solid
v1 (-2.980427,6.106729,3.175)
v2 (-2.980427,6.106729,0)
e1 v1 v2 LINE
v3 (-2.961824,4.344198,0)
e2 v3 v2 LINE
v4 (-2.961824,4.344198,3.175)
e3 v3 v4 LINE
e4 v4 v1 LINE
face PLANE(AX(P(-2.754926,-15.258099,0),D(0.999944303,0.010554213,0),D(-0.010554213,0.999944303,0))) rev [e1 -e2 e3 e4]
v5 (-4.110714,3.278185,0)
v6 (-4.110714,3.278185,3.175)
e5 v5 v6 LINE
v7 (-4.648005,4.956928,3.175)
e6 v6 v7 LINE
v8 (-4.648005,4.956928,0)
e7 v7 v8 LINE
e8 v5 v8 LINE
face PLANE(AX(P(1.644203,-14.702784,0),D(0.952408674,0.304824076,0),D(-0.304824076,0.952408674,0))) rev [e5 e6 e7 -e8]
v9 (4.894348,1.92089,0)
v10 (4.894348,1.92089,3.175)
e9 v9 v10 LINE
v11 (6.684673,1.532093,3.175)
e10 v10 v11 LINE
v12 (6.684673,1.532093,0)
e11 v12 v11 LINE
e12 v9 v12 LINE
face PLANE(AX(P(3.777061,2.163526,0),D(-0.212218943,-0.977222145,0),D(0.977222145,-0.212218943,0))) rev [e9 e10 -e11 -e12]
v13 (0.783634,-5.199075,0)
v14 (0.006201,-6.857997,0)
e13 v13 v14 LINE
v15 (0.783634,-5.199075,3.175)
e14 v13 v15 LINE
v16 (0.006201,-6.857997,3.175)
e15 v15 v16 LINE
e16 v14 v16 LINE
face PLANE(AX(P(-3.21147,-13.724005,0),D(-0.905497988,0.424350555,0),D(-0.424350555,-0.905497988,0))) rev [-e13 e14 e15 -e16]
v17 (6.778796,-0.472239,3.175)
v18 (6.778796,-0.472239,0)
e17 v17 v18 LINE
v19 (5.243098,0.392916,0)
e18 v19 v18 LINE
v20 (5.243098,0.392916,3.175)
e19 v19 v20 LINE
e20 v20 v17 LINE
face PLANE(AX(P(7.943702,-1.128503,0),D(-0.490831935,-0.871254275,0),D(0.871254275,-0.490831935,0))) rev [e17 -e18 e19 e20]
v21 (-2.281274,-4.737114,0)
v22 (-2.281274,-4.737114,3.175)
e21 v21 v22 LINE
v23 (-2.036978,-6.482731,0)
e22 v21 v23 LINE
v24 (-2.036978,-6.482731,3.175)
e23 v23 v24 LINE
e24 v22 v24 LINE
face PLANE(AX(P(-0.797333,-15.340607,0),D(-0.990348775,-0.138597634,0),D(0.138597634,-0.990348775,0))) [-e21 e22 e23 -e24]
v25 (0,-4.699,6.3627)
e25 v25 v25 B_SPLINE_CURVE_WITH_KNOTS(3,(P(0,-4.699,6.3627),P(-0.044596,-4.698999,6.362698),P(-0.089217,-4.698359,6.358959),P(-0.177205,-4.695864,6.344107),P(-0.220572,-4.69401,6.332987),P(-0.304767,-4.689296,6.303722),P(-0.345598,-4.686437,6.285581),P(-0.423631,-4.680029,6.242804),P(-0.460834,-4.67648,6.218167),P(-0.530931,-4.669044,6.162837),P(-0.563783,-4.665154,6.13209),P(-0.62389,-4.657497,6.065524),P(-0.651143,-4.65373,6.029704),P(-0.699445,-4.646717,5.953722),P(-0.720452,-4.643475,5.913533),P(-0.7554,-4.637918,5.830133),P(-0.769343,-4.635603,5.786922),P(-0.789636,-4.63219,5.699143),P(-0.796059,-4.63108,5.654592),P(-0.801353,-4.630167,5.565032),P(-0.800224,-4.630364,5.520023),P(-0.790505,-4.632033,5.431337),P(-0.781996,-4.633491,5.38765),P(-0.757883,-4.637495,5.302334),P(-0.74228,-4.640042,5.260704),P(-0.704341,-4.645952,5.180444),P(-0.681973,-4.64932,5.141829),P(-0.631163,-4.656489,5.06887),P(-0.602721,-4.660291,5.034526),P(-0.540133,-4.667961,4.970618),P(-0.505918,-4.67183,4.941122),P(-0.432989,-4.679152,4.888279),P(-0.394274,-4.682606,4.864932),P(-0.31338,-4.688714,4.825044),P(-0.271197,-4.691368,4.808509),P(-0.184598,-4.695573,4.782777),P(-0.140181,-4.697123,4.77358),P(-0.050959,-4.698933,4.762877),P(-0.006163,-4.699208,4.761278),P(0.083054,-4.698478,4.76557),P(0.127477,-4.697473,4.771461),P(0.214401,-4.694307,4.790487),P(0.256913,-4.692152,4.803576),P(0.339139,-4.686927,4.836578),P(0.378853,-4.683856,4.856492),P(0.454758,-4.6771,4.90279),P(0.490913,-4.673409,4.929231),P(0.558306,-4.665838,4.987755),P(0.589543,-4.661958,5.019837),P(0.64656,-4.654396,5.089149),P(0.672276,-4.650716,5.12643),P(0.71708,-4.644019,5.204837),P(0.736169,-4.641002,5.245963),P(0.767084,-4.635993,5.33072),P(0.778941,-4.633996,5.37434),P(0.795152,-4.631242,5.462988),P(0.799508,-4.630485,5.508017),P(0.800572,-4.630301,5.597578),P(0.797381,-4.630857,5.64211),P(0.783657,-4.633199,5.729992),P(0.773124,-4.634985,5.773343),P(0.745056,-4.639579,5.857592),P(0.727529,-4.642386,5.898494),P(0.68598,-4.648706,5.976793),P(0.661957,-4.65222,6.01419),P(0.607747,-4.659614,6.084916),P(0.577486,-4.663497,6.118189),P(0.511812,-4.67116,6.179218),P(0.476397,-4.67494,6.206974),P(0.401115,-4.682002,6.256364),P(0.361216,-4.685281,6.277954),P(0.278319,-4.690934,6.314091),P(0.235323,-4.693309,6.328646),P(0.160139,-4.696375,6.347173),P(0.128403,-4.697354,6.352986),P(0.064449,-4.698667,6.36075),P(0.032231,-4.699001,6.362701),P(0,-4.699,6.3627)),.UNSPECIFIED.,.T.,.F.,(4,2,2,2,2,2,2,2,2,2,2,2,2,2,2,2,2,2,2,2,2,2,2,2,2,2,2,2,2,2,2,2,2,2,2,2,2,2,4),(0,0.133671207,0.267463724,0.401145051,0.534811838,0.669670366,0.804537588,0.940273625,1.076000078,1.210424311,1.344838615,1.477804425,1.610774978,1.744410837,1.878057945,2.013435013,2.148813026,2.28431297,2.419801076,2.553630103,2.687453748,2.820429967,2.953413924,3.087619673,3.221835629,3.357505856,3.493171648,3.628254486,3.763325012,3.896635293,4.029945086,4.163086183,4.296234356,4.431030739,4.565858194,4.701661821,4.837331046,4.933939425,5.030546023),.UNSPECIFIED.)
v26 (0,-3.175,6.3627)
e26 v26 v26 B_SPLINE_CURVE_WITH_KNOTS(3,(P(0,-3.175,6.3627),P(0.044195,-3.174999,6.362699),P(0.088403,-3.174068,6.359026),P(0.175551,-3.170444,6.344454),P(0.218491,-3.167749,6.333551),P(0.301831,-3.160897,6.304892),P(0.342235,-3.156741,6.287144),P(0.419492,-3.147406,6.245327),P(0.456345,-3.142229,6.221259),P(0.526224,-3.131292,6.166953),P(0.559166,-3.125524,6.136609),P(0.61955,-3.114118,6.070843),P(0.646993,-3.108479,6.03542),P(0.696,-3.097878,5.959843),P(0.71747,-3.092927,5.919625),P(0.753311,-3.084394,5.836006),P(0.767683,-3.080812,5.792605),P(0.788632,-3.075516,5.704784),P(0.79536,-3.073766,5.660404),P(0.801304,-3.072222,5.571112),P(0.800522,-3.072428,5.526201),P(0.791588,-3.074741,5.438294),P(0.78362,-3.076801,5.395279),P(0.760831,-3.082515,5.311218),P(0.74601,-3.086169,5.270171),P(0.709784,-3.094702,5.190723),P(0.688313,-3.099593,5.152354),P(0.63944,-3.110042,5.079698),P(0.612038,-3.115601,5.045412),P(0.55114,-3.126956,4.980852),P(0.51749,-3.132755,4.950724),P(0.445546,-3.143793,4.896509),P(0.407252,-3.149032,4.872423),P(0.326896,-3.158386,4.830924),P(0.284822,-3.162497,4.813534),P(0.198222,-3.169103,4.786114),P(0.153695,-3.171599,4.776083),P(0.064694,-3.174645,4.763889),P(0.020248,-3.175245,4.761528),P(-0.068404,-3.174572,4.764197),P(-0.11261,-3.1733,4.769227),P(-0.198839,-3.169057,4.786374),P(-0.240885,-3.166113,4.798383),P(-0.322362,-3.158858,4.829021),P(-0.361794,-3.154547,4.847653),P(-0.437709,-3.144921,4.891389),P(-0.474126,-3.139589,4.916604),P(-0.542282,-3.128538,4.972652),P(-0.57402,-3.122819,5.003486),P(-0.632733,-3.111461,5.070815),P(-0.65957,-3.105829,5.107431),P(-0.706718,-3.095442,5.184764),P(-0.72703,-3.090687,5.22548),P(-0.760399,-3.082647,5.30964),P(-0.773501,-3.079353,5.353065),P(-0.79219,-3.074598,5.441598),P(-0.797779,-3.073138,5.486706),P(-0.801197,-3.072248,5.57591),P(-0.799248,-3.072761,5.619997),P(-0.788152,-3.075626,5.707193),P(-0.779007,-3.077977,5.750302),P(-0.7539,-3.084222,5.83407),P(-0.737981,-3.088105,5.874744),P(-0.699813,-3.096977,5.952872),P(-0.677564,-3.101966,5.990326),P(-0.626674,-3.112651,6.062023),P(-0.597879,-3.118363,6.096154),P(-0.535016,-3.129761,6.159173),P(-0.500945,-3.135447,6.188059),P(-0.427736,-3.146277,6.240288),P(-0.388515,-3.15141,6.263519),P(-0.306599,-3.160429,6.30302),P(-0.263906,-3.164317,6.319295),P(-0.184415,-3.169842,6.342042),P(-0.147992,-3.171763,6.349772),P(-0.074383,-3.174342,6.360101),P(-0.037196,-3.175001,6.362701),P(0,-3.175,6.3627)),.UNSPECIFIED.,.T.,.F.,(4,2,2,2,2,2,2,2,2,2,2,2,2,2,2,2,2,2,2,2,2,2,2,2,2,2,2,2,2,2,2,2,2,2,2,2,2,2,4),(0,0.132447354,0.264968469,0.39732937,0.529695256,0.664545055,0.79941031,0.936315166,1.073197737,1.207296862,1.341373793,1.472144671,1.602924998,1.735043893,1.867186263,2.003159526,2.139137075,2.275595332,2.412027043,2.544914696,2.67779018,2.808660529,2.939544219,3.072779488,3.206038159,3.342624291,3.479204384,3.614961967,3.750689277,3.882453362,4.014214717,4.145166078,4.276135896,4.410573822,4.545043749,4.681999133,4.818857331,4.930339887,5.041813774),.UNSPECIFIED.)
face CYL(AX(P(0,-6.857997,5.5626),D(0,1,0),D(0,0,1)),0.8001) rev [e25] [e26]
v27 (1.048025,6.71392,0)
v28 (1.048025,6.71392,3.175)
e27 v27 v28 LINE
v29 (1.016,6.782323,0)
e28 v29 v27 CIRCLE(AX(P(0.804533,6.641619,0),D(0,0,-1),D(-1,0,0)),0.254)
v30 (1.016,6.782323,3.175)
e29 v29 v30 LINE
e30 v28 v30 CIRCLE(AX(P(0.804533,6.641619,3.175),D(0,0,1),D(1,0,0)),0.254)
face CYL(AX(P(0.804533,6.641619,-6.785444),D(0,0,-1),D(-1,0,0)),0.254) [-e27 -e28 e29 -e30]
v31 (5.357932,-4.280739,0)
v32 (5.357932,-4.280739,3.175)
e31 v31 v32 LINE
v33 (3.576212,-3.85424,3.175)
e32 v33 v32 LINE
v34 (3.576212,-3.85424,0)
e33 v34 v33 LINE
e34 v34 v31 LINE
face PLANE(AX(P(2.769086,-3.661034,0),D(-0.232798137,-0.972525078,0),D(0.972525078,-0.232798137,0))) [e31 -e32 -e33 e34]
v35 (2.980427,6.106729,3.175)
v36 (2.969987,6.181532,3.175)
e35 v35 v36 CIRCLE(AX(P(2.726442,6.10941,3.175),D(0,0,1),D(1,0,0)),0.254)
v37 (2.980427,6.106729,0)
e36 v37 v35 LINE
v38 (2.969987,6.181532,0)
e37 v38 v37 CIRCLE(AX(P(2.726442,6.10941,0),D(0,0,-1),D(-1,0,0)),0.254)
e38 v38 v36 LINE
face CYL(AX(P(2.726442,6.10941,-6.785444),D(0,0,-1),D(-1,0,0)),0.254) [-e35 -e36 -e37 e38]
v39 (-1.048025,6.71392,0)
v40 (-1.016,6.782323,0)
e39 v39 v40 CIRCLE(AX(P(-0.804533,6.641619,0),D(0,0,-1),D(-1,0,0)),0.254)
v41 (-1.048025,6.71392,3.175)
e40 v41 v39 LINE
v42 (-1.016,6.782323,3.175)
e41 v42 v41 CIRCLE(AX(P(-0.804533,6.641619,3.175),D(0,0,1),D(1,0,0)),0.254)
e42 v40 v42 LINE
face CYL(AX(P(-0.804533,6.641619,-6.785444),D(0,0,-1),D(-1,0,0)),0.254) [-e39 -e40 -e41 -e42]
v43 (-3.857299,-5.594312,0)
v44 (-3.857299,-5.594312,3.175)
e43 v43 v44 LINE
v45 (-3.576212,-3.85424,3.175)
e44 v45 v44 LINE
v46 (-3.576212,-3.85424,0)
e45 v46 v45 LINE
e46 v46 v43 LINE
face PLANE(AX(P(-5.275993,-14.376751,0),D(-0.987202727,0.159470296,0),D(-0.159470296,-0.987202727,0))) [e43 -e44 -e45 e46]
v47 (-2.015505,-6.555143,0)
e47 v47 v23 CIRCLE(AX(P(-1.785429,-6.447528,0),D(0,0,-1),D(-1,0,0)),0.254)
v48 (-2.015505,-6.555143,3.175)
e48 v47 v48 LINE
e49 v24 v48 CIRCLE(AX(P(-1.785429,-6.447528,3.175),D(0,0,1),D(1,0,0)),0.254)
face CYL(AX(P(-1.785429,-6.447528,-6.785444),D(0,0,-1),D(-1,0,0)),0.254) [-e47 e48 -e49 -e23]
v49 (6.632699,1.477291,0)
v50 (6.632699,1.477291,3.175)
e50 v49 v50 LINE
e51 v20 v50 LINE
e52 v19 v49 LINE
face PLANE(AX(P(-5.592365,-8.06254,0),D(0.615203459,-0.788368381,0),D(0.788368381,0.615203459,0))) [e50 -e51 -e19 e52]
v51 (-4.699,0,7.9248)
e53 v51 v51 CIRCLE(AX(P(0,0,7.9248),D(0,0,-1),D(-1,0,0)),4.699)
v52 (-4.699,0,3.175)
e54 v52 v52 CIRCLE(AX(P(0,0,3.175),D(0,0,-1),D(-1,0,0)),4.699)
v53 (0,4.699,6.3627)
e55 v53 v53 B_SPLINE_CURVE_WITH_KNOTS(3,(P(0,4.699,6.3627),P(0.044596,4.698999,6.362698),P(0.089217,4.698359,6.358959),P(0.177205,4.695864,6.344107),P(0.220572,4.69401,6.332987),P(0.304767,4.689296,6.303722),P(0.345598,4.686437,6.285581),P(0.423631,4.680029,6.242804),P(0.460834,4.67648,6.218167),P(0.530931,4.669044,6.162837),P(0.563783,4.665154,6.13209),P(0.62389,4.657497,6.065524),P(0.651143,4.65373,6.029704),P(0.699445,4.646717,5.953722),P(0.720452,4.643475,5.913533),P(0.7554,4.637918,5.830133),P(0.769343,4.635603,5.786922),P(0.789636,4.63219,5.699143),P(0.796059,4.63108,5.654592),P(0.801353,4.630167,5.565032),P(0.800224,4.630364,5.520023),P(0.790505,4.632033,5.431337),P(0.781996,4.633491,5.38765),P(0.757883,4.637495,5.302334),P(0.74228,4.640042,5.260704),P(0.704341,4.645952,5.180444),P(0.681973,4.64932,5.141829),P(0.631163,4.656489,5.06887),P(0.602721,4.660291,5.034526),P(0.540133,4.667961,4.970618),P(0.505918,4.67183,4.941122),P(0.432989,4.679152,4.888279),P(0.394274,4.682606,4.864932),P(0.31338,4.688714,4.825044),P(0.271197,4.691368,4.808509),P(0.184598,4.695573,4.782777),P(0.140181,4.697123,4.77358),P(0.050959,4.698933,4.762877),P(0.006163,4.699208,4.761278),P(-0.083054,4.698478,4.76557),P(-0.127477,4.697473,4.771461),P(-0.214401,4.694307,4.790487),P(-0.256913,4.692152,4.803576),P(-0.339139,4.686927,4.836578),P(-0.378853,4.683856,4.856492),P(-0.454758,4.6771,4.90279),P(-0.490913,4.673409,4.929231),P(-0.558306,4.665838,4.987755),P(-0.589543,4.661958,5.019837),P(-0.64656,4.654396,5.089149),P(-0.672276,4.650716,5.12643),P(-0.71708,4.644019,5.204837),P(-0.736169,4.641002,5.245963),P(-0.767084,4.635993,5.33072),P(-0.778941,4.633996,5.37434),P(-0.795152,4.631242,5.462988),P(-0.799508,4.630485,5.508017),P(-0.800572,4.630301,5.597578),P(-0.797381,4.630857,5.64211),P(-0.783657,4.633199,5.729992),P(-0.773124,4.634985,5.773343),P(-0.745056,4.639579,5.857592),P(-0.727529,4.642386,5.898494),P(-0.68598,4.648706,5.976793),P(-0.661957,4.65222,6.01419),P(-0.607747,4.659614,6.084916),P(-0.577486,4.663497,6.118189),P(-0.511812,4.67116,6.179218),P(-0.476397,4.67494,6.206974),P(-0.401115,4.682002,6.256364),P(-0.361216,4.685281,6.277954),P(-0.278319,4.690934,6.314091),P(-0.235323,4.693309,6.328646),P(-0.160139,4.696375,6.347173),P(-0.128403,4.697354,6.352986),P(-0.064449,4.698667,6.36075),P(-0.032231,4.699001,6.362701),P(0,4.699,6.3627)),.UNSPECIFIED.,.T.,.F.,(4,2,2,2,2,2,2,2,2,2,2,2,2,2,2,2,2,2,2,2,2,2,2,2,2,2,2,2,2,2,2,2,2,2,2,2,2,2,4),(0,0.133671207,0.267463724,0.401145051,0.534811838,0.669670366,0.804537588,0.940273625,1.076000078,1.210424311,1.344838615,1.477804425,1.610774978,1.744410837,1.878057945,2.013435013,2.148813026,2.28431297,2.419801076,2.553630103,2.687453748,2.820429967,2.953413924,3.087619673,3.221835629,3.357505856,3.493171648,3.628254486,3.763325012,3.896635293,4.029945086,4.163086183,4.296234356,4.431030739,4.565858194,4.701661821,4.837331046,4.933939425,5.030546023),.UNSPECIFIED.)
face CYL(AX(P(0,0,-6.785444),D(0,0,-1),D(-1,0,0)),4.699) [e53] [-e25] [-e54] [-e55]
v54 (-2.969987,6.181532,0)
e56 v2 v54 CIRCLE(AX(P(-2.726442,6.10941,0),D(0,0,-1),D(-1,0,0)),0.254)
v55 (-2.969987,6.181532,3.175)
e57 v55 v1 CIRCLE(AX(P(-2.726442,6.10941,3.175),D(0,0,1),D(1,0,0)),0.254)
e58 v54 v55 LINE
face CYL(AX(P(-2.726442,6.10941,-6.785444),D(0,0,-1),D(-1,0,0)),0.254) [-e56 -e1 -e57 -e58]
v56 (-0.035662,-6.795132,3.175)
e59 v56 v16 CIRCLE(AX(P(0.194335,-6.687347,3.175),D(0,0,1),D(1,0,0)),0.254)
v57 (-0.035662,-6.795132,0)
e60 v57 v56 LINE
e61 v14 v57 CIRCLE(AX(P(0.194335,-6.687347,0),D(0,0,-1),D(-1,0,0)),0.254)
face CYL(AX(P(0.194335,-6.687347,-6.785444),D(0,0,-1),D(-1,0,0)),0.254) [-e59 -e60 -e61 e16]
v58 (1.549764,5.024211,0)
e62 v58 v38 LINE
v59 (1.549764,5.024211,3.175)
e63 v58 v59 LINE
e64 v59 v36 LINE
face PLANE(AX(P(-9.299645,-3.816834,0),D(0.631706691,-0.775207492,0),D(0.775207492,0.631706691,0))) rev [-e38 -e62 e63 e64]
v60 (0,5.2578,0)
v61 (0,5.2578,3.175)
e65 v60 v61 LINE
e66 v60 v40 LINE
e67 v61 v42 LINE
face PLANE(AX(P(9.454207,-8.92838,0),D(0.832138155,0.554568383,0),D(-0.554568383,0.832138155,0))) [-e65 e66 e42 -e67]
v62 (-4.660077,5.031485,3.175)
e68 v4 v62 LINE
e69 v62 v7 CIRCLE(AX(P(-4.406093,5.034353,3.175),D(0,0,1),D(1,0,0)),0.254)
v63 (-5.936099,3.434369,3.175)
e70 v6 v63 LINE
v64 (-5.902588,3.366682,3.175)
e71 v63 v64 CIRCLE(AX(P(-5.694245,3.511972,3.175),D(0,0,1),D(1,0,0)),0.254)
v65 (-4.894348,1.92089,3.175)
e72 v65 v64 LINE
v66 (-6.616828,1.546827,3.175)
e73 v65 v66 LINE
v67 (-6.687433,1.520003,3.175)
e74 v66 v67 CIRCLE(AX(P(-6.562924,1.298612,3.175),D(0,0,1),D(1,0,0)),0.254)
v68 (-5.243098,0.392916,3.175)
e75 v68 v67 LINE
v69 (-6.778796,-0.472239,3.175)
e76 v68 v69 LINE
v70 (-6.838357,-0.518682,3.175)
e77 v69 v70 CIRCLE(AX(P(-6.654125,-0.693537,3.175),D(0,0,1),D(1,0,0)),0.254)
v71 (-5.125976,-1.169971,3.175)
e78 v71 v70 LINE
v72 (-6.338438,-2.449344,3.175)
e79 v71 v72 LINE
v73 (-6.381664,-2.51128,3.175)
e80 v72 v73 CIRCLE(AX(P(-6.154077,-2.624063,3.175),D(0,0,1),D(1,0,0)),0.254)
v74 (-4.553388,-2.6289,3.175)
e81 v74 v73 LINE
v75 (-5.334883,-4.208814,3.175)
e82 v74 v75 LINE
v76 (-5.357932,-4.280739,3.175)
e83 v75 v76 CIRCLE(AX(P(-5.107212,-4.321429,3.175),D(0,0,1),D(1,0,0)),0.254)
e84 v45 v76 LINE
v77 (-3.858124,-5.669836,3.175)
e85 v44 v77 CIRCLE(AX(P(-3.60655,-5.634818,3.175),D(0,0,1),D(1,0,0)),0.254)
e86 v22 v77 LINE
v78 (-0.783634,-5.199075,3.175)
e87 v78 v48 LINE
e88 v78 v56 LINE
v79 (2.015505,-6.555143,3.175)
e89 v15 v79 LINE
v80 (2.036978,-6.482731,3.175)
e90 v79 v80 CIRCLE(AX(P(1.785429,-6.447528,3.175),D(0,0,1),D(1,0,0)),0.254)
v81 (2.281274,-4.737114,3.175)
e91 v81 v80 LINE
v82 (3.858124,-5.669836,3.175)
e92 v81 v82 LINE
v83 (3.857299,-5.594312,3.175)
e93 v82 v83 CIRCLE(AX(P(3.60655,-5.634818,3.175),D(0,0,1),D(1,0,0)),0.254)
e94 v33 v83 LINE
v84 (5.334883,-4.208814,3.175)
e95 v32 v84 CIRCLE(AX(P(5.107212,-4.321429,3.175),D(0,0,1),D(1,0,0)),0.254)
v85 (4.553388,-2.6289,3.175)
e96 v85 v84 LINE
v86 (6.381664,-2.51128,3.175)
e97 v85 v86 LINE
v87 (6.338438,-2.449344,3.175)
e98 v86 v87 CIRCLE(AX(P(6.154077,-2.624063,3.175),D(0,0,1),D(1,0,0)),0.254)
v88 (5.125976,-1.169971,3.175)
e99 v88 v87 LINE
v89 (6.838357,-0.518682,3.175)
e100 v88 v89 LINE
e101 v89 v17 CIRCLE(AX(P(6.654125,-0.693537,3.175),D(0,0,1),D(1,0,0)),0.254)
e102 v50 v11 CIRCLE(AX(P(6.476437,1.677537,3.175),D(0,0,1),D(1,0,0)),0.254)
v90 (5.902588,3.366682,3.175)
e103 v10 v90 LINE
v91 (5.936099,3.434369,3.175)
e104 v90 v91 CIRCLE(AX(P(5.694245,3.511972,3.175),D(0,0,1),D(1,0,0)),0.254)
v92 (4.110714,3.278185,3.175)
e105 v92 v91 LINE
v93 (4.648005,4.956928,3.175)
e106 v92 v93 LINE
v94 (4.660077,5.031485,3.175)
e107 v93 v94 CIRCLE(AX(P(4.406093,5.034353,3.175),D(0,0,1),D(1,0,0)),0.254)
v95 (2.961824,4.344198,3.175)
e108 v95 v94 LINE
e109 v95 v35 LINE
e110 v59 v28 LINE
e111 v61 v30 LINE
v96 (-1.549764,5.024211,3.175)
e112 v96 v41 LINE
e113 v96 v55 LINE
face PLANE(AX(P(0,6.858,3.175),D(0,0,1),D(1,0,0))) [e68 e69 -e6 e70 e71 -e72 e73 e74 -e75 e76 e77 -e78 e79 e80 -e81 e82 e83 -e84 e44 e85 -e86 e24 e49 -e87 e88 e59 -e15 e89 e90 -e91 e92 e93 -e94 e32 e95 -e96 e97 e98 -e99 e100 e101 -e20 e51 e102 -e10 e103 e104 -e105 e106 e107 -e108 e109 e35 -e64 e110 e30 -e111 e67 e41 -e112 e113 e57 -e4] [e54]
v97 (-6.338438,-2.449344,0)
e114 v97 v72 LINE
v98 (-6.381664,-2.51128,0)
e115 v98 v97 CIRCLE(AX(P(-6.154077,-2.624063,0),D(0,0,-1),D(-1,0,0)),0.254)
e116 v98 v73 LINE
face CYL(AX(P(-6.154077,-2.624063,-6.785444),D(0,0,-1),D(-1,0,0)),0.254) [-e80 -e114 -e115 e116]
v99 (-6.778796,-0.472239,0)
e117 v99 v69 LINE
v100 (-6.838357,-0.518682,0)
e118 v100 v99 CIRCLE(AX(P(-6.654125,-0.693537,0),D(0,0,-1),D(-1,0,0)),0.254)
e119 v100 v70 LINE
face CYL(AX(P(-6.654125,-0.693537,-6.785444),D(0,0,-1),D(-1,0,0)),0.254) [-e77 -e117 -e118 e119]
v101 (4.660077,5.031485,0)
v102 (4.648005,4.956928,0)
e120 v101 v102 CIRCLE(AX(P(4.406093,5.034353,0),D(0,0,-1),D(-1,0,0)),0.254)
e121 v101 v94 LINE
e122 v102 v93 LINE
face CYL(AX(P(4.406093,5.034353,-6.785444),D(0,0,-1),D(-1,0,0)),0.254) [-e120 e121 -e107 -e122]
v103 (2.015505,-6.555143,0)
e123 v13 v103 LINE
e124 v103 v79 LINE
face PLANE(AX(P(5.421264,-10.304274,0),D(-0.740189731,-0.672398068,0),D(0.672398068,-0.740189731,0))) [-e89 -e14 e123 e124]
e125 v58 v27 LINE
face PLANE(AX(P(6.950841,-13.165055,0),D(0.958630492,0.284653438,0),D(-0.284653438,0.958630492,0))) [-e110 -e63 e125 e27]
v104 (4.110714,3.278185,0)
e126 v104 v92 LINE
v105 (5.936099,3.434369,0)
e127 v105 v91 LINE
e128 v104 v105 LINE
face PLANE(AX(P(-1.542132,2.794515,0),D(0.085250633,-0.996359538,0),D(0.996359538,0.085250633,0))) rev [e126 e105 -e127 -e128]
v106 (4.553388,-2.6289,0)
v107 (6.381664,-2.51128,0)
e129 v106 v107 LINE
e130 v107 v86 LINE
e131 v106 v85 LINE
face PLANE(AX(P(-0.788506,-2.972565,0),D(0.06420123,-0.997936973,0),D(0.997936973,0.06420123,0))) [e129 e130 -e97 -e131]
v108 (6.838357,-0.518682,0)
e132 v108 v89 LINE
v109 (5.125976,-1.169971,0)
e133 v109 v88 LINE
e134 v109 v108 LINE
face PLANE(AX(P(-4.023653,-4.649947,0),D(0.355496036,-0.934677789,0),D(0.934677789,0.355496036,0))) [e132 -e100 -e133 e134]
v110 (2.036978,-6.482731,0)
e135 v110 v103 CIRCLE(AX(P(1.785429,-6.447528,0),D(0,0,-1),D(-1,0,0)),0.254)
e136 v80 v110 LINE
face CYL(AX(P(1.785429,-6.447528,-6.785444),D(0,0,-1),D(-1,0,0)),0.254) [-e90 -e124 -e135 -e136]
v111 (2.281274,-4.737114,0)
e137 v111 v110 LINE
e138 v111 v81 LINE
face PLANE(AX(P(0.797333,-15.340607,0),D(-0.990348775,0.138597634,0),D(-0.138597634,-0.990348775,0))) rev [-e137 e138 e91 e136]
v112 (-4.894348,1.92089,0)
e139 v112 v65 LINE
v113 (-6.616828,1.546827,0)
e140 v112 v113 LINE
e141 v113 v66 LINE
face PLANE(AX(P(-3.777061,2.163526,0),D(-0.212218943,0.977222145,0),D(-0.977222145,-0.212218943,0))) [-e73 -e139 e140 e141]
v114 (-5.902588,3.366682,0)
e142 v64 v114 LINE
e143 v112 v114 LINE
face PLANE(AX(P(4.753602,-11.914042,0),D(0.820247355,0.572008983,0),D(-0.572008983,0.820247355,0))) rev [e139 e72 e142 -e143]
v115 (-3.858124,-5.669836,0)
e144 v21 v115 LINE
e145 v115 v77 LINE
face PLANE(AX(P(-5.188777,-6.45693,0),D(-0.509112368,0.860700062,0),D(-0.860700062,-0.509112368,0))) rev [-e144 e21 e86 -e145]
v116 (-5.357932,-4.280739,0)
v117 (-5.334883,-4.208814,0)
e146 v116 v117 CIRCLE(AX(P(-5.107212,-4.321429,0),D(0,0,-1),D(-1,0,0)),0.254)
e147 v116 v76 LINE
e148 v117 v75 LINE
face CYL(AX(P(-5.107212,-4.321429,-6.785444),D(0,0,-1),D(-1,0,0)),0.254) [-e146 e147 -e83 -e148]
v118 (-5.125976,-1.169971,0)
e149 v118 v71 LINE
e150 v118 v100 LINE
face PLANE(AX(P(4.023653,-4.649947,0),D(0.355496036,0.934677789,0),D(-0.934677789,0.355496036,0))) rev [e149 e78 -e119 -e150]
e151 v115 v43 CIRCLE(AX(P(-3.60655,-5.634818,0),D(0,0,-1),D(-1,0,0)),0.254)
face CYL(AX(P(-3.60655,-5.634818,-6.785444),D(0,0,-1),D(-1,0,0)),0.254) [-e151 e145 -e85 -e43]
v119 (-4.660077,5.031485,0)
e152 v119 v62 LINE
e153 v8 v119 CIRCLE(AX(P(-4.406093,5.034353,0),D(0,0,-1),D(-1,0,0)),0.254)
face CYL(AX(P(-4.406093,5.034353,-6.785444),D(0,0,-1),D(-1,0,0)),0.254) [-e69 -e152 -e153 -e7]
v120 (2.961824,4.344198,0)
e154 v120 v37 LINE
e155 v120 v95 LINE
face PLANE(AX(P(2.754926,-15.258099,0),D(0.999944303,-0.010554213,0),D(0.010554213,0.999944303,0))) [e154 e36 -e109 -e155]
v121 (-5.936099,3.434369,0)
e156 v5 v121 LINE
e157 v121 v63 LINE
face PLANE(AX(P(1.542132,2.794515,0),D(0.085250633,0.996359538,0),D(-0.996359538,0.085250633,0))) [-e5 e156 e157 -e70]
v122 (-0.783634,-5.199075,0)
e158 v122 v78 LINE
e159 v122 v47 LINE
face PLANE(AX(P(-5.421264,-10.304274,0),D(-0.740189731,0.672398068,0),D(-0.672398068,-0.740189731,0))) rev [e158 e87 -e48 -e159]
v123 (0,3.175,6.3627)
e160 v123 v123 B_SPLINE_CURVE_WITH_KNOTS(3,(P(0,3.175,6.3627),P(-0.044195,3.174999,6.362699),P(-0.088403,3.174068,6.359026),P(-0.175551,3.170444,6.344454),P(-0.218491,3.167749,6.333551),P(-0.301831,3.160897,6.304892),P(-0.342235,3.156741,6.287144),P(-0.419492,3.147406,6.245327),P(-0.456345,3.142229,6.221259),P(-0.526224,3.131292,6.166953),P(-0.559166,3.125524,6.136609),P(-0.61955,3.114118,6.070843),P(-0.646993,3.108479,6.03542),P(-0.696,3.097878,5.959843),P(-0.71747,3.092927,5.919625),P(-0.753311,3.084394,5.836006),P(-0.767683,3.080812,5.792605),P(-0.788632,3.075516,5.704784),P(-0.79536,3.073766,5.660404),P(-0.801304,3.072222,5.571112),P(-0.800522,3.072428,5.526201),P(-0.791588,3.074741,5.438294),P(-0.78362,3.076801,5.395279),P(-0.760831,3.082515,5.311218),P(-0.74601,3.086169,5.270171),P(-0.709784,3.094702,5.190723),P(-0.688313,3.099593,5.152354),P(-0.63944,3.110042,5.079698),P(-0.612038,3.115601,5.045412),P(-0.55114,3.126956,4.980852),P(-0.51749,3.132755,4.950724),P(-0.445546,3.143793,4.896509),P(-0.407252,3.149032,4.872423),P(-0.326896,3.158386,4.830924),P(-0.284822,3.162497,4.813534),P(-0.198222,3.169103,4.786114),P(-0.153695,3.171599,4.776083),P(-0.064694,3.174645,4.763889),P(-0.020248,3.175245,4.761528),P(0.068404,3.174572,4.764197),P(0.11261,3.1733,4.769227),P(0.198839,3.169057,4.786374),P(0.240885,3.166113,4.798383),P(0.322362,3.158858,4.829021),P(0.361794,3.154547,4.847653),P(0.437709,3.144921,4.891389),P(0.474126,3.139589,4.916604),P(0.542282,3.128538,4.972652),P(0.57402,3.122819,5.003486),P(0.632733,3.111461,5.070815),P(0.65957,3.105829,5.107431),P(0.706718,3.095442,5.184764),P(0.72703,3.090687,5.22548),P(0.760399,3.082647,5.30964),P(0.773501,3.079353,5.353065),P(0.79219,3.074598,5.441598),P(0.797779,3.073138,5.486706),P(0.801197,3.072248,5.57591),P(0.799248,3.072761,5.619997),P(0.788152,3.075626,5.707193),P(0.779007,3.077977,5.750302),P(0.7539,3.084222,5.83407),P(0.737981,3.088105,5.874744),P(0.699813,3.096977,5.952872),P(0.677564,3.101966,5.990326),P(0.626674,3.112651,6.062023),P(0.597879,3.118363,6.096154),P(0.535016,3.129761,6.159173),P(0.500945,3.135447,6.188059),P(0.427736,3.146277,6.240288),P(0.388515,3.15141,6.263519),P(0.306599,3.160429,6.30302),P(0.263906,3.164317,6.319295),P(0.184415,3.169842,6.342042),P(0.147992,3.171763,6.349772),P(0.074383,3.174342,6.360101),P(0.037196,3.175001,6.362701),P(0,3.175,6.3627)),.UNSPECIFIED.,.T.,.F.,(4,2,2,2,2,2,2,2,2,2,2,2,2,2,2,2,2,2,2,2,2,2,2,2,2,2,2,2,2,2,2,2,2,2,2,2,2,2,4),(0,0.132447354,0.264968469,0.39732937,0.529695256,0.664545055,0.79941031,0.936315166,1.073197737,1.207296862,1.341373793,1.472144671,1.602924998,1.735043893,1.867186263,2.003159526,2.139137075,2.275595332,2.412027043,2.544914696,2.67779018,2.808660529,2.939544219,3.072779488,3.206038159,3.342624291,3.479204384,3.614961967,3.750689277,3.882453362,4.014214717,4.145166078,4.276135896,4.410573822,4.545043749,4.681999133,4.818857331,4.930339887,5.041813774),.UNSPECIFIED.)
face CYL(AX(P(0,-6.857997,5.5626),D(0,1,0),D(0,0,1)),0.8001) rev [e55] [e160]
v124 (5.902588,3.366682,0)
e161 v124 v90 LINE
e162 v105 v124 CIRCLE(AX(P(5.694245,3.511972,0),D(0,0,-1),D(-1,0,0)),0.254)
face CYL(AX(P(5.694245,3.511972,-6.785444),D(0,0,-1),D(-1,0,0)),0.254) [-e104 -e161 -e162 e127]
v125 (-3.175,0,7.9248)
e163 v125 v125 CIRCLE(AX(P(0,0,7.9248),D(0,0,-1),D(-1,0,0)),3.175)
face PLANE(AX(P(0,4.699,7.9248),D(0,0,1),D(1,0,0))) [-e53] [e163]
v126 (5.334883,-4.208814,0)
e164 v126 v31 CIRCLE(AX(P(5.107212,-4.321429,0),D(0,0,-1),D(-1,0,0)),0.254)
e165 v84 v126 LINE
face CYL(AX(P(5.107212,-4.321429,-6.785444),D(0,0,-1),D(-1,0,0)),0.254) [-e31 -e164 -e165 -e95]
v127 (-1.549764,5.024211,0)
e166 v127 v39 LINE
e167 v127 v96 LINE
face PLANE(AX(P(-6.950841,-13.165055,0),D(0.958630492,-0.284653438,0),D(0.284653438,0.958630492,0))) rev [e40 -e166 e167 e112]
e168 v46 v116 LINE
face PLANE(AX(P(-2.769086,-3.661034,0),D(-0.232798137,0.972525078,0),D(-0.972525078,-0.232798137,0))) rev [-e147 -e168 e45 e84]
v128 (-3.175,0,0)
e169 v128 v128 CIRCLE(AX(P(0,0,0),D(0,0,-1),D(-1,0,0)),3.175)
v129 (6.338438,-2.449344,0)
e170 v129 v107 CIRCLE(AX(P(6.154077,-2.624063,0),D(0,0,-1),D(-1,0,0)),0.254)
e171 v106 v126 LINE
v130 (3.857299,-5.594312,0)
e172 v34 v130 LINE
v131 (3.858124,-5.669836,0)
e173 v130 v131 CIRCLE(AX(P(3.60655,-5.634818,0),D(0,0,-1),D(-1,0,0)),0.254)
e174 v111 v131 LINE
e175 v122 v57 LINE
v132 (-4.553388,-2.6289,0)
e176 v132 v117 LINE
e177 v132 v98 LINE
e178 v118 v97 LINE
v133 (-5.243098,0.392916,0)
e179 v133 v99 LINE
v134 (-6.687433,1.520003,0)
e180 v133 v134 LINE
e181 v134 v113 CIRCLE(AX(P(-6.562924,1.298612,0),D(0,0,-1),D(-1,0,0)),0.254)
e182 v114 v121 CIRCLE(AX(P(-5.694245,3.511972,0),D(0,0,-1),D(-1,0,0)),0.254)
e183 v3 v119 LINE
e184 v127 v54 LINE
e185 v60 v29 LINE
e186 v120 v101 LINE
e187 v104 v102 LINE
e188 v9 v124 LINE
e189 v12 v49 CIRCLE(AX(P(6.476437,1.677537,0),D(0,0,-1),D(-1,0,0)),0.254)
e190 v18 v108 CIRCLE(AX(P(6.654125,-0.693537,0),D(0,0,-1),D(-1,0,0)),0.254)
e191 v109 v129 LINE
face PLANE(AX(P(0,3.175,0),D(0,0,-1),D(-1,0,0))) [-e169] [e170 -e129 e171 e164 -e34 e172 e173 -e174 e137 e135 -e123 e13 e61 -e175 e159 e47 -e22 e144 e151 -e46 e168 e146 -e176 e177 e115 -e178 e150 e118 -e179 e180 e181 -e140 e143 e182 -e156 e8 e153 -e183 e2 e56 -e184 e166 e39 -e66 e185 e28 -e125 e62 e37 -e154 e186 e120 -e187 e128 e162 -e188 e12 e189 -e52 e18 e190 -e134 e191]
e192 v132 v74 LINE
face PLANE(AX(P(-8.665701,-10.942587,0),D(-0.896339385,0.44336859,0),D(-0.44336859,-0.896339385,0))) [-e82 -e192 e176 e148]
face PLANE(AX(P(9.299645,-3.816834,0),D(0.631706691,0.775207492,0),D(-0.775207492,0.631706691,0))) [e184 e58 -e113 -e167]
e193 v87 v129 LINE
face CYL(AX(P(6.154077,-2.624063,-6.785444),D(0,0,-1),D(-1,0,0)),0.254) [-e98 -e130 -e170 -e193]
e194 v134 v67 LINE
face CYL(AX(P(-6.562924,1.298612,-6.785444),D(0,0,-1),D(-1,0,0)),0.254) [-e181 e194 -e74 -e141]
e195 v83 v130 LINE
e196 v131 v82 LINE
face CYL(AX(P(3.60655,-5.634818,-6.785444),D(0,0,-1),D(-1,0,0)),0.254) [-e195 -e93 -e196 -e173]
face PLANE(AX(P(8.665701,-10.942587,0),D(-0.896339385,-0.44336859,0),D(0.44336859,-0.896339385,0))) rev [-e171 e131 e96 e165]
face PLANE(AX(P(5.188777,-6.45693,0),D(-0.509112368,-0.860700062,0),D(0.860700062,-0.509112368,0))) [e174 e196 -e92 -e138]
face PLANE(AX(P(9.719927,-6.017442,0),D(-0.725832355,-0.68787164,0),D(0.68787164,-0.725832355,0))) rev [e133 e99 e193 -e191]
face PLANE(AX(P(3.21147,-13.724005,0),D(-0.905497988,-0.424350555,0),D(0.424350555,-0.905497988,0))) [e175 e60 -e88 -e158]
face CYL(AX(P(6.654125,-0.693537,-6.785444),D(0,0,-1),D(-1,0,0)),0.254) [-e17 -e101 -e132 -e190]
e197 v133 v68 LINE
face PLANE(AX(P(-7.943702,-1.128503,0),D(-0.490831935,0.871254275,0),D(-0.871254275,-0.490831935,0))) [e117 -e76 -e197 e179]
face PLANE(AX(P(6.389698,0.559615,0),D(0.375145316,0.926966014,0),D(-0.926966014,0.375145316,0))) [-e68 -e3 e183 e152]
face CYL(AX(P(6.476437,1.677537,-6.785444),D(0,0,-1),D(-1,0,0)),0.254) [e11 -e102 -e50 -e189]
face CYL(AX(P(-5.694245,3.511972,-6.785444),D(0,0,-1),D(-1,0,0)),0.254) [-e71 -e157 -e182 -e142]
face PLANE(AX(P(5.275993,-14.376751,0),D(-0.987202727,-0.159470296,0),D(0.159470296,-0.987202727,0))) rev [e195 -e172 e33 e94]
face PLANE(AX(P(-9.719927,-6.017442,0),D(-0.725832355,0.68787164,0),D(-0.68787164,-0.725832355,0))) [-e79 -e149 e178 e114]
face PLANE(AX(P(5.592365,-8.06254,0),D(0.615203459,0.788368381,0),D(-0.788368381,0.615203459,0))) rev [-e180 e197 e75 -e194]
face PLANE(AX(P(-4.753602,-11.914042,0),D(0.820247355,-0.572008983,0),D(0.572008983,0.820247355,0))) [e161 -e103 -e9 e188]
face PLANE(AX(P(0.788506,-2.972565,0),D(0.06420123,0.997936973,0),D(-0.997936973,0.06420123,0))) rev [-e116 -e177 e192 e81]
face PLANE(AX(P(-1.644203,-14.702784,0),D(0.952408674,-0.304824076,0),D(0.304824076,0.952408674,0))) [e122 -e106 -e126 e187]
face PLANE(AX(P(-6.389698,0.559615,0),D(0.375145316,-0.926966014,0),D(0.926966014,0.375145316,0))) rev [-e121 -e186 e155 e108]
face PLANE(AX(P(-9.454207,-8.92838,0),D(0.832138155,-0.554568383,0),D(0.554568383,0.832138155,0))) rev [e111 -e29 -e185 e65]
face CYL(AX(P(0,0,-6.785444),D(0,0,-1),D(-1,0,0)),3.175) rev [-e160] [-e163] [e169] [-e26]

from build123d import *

# Parameters (mm, degrees)
CUT_EXTRUDE5_DEPTH      = 11.799302202
CUT_EXTRUDE5_DEPTH_BACK = 11.799302202
FILLET1_R               = 0.254
CUT_EXTRUDE4_DEPTH      = 13.513900808
CUT_EXTRUDE4_DEPTH_BACK = 13.513900808
SKETCH4_R               = 0.8001


with BuildPart() as part:
    # Sketch2 → Revolve1 (revolve)
    with BuildSketch(Plane(origin=(0, 0, 0), x_dir=(0, 0, -1), z_dir=(1, 0, 0)), mode=Mode.PRIVATE) as revolve1_sk:
        Polygon((0, 3.175), (0, 6.858), (-3.175, 6.858), (-3.175, 4.699), (-7.9248, 4.699), (-7.9248, 3.175), align=None)
    revolve(revolve1_sk.sketch.rotate(Axis((0, 0, -6.785443847), (0, 0, 1)), 90), axis=Axis((0, 0, -6.785443847), (0, 0, 1)))

    # Sketch5 → Cut-Extrude5 (cut, two sides: drawn at the far end of the back side and taken through both)
    with BuildSketch(Plane.XY.offset(3.175).offset(-CUT_EXTRUDE5_DEPTH_BACK)):
        with BuildLine():
            Line((-1.549763756, 5.024210698), (-1.028262887, 6.780474868))
            ThreePointArc((-1.028262887, 6.780474868), (-2.021430986, 6.553318302), (-2.969986829, 6.181532354))
            Line((-2.969986829, 6.181532354), (-1.549763756, 5.024210698))
        make_face()
        with BuildLine():
            Line((-2.961824201, 4.344198228), (-2.981160105, 6.176151587))
            ThreePointArc((-2.981160105, 6.176151587), (-3.863248958, 5.666345514), (-4.660077294, 5.031485229))
            Line((-4.660077294, 5.031485229), (-2.961824201, 4.344198228))
        make_face()
        with BuildLine():
            Line((-4.110713569, 3.27818468), (-4.669168164, 5.023050135))
            ThreePointArc((-4.669168164, 5.023050135), (-5.361800307, 4.275893061), (-5.936099441, 3.434368562))
            Line((-5.936099441, 3.434368562), (-4.110713569, 3.27818468))
        make_face()
        with BuildLine():
            Line((-4.894347996, 1.920890038), (-5.942300142, 3.423628634))
            ThreePointArc((-5.942300142, 3.423628634), (-6.383932168, 2.505508745), (-6.684673103, 1.532093177))
            Line((-6.684673103, 1.532093177), (-4.894347996, 1.920890038))
        make_face()
        with BuildLine():
            Line((-5.243098125, 0.392915886), (-6.687432674, 1.520002705))
            ThreePointArc((-6.687432674, 1.520002705), (-6.838823641, 0.512498982), (-6.839284225, -0.50631541))
            Line((-6.839284225, -0.50631541), (-5.243098125, 0.392915886))
        make_face()
        with BuildLine():
            Line((-5.125975977, -1.169970567), (-6.838357467, -0.518682134))
            ThreePointArc((-6.838357467, -0.518682134), (-6.686055622, -1.526048565), (-6.386194929, -2.499735652))
            Line((-6.386194929, -2.499735652), (-5.125975977, -1.169970567))
        make_face()
        with BuildLine():
            Line((-4.553388368, -2.6289), (-6.381664189, -2.51127979))
            ThreePointArc((-6.381664189, -2.51127979), (-5.939202219, -3.429), (-5.365664189, -4.271043411))
            Line((-5.365664189, -4.271043411), (-4.553388368, -2.6289))
        make_face()
        with BuildLine():
            Line((-3.576212221, -3.854240132), (-5.357932042, -4.280739216))
            ThreePointArc((-5.357932042, -4.280739216), (-4.664624636, -5.027269737), (-3.868370638, -5.662850219))
            Line((-3.868370638, -5.662850219), (-3.576212221, -3.854240132))
        make_face()
        with BuildLine():
            Line((-2.281273924, -4.737114114), (-3.85812412, -5.669836177))
            ThreePointArc((-3.85812412, -5.669836177), (-2.975574683, -6.178844496), (-2.02735538, -6.551487935))
            Line((-2.02735538, -6.551487935), (-2.281273924, -4.737114114))
        make_face()
        with BuildLine():
            Line((-0.783634427, -5.199074718), (-2.015504939, -6.555143312))
            ThreePointArc((-2.015504939, -6.555143312), (-1.022131861, -6.781401806), (-0.0062007, -6.857997197))
            Line((-0.0062007, -6.857997197), (-0.783634427, -5.199074718))
        make_face()
        with BuildLine():
            ThreePointArc((0.0062007, -6.857997197), (1.022131861, -6.781401806), (2.015504939, -6.555143312))
            Line((2.015504939, -6.555143312), (0.783634427, -5.199074718))
            Line((0.783634427, -5.199074718), (0.0062007, -6.857997197))
        make_face()
        with BuildLine():
            ThreePointArc((2.02735538, -6.551487935), (2.975574683, -6.178844496), (3.85812412, -5.669836177))
            Line((3.85812412, -5.669836177), (2.281273924, -4.737114114))
            Line((2.281273924, -4.737114114), (2.02735538, -6.551487935))
        make_face()
        with BuildLine():
            ThreePointArc((3.868370638, -5.662850219), (4.664624636, -5.027269737), (5.357932042, -4.280739216))
            Line((5.357932042, -4.280739216), (3.576212221, -3.854240132))
            Line((3.576212221, -3.854240132), (3.868370638, -5.662850219))
        make_face()
        with BuildLine():
            ThreePointArc((5.365664189, -4.271043411), (5.939202219, -3.429), (6.381664189, -2.51127979))
            Line((6.381664189, -2.51127979), (4.553388368, -2.6289))
            Line((4.553388368, -2.6289), (5.365664189, -4.271043411))
        make_face()
        with BuildLine():
            ThreePointArc((6.386194929, -2.499735652), (6.686055622, -1.526048565), (6.838357467, -0.518682134))
            Line((6.838357467, -0.518682134), (5.125975977, -1.169970567))
            Line((5.125975977, -1.169970567), (6.386194929, -2.499735652))
        make_face()
        with BuildLine():
            ThreePointArc((6.858, 0), (6.815224768, 0.764771443), (6.687432674, 1.520002705))
            Line((6.687432674, 1.520002705), (5.243098125, 0.392915886))
            Line((5.243098125, 0.392915886), (6.839284225, -0.50631541))
            ThreePointArc((6.839284225, -0.50631541), (6.853319459, -0.253330602), (6.858, 0))
        make_face()
        with BuildLine():
            ThreePointArc((6.684673103, 1.532093177), (6.383932168, 2.505508745), (5.942300142, 3.423628634))
            Line((5.942300142, 3.423628634), (4.894347996, 1.920890038))
            Line((4.894347996, 1.920890038), (6.684673103, 1.532093177))
        make_face()
        with BuildLine():
            ThreePointArc((5.936099441, 3.434368562), (5.361800307, 4.275893061), (4.669168164, 5.023050135))
            Line((4.669168164, 5.023050135), (4.110713569, 3.27818468))
            Line((4.110713569, 3.27818468), (5.936099441, 3.434368562))
        make_face()
        with BuildLine():
            ThreePointArc((4.660077294, 5.031485229), (3.863248958, 5.666345514), (2.981160105, 6.176151587))
            Line((2.981160105, 6.176151587), (2.961824201, 4.344198228))
            Line((2.961824201, 4.344198228), (4.660077294, 5.031485229))
        make_face()
        with BuildLine():
            ThreePointArc((2.969986829, 6.181532354), (2.021430986, 6.553318302), (1.028262887, 6.780474868))
            Line((1.028262887, 6.780474868), (1.549763756, 5.024210698))
            Line((1.549763756, 5.024210698), (2.969986829, 6.181532354))
        make_face()
        with BuildLine():
            Line((0, 6.858), (0, 5.2578))
            Line((0, 5.2578), (1.016, 6.782323201))
            ThreePointArc((1.016, 6.782323201), (0.509407248, 6.839054632), (0, 6.858))
        make_face()
        with BuildLine():
            Line((-1.016, 6.782323201), (0, 5.2578))
            Line((0, 5.2578), (0, 6.858))
            ThreePointArc((0, 6.858), (-0.509407248, 6.839054632), (-1.016, 6.782323201))
        make_face()
    extrude(amount=CUT_EXTRUDE5_DEPTH + CUT_EXTRUDE5_DEPTH_BACK, mode=Mode.SUBTRACT)

    # Fillet1
    # the kernel refuses this fillet: 0.254 mm, written as the material it takes off along each edge
    with BuildSketch(Plane(origin=(1.028262887, 6.780474868, -0.173566316), x_dir=(0.2846534382375399, -0.958630491951694, 0), z_dir=(0, 0, 1)), Plane(origin=(2.981160105, 6.176151587, -0.173566316), x_dir=(-0.010554213197513457, -0.9999443027407983, 0), z_dir=(0, 0, 1)), Plane(origin=(4.669168164, 5.023050135, -0.173566316), x_dir=(-0.3048240764735684, -0.9524086740480875, 0), z_dir=(0, 0, 1)), Plane(origin=(5.942300142, 3.423628634, -0.173566316), x_dir=(-0.5720089828565192, -0.8202473550895794, 0), z_dir=(0, 0, 1))) as fillet1_piece_1:
        with BuildLine():
            CenterArc((0.069426526, -0.254), FILLET1_R, 90, 17.100666737)
            Line((-0.005262541, -0.011229443), (-0.006756323, -0.006374032))
            ThreePointArc((-0.006756323, -0.006374032), (-0.007233739, -0.003457831), (-0.004597979, 0.002159859))
            Line((-0.004597979, 0.002159859), (0, 0.00508))
            Line((0, 0.00508), (0.069426526, 0.00508))
            Line((0.069426526, 0.00508), (0.069426526, 0))
        make_face()
    extrude(amount=3.522132632, mode=Mode.SUBTRACT)
    with BuildSketch(Plane(origin=(6.687432674, 1.520002705, 3.348566316), x_dir=(-0.7883683808925953, -0.6152034590351292, 0), z_dir=(0, 0, -1)), Plane(origin=(-0.0062007, -6.857997197, 3.348566316), x_dir=(-0.4243505554663044, 0.9054979878914358, 0), z_dir=(0, 0, -1)), Plane(origin=(-2.02735538, -6.551487935, 3.348566316), x_dir=(-0.13859763357417676, 0.9903487749109595, 0), z_dir=(0, 0, -1)), Plane(origin=(-3.868370638, -5.662850219, 3.348566316), x_dir=(0.15947029628670847, 0.9872027272056279, 0), z_dir=(0, 0, -1)), Plane(origin=(-5.365664189, -4.271043411, 3.348566316), x_dir=(0.4433685904986441, 0.8963393849202688, 0), z_dir=(0, 0, -1)), Plane(origin=(-6.386194929, -2.499735652, 3.348566316), x_dir=(0.687871639753785, 0.7258323547641282, 0), z_dir=(0, 0, -1)), Plane(origin=(-6.684673103, 1.532093177, 3.348566316), x_dir=(0.9772221447470836, 0.21221894311279188, 0), z_dir=(0, 0, -1))) as fillet1_piece_2:
        with BuildLine():
            CenterArc((0.069426526, 0.254), FILLET1_R, 252.899333263, 17.100666737)
            Line((-0.005262541, 0.011229443), (-0.006756323, 0.006374032))
            ThreePointArc((-0.006756323, 0.006374032), (-0.007233739, 0.003457831), (-0.004597979, -0.002159859))
            Line((-0.004597979, -0.002159859), (0, -0.00508))
            Line((0, -0.00508), (0.069426526, -0.00508))
            Line((0.069426526, -0.00508), (0.069426526, 0))
        make_face()
    extrude(amount=3.522132632, mode=Mode.SUBTRACT)
    with BuildSketch(Plane(origin=(6.839284225, -0.50631541, 3.348566316), x_dir=(-0.07473009358640008, -0.9972037971811819, 0), z_dir=(0, 0, -1)), Plane(origin=(6.386194929, -2.499735652, 3.348566316), x_dir=(-0.3653410243663928, -0.9308737486442051, 0), z_dir=(0, 0, -1)), Plane(origin=(5.365664189, -4.271043411, 3.348566316), x_dir=(-0.623489801858665, -0.7818314824680845, 0), z_dir=(0, 0, -1)), Plane(origin=(3.868370638, -5.662850219, 3.348566316), x_dir=(-0.8262387743159489, -0.5633200580636893, 0), z_dir=(0, 0, -1)), Plane(origin=(2.02735538, -6.551487935, 3.348566316), x_dir=(-0.9555728057861146, -0.2947551744109893, 0), z_dir=(0, 0, -1)), Plane(origin=(-1.028262887, 6.780474868, 3.348566316), x_dir=(0.9888308262251171, 0.14904226617625063, 0), z_dir=(0, 0, -1)), Plane(origin=(-2.981160105, 6.176151587, 3.348566316), x_dir=(0.9009688679024408, 0.4338837391175129, 0), z_dir=(0, 0, -1)), Plane(origin=(-4.669168164, 5.023050135, 3.348566316), x_dir=(0.7330518718297447, 0.6801727377710072, 0), z_dir=(0, 0, -1)), Plane(origin=(-5.942300142, 3.423628634, 3.348566316), x_dir=(0.50000000000004, 0.8660254037844156, 0), z_dir=(0, 0, -1))) as fillet1_piece_3:
        with BuildLine():
            CenterArc((0.200535304, 0.170650621), FILLET1_R, 205.109562615, 17.100666737)
            Line((-0.029461185, 0.06286558), (-0.034061115, 0.060709879))
            Line((-0.034061115, 0.060709879), (-0.00459993, -0.002155701))
            Line((-0.00459993, -0.002155701), (-4.593e-06, -0.005079998))
            ThreePointArc((-4.593e-06, -0.005079998), (0.0062007, -0.005082803), (0.008638723, -0.003413012))
            Line((0.008638723, -0.003413012), (0.012401401, 0))
        make_face()
    extrude(amount=3.522132632, mode=Mode.SUBTRACT)
    with BuildSketch(Plane(origin=(-6.839284225, -0.50631541, 3.348566316), x_dir=(0.07473009358634887, -0.9972037971811858, 0), z_dir=(0, 0, -1))) as fillet1_piece_4:
        with BuildLine():
            CenterArc((0.200535304, -0.170650621), FILLET1_R, 137.789770648, 17.100666737)
            Line((-0.029461185, -0.06286558), (-0.034061115, -0.060709879))
            Line((-0.034061115, -0.060709879), (-0.00459993, 0.002155701))
            Line((-0.00459993, 0.002155701), (-4.593e-06, 0.005079998))
            ThreePointArc((-4.593e-06, 0.005079998), (0.0062007, 0.005082803), (0.008638723, 0.003413012))
            Line((0.008638723, 0.003413012), (0.012401401, 0))
        make_face()
    extrude(amount=3.522132632, mode=Mode.SUBTRACT)

    # Sketch4 → Cut-Extrude4 (cut, two sides: drawn at the far end of the back side and taken through both)
    with BuildSketch(Plane(origin=(0, 0, 0), x_dir=(1, 0, 0), z_dir=(0, 1, 0)).offset(-CUT_EXTRUDE4_DEPTH_BACK)):
        with Locations(Location((0, -5.5626, 0), (0, 0, 270))):
            Circle(SKETCH4_R)
    extrude(amount=CUT_EXTRUDE4_DEPTH + CUT_EXTRUDE4_DEPTH_BACK, mode=Mode.SUBTRACT)


solid = part.part
